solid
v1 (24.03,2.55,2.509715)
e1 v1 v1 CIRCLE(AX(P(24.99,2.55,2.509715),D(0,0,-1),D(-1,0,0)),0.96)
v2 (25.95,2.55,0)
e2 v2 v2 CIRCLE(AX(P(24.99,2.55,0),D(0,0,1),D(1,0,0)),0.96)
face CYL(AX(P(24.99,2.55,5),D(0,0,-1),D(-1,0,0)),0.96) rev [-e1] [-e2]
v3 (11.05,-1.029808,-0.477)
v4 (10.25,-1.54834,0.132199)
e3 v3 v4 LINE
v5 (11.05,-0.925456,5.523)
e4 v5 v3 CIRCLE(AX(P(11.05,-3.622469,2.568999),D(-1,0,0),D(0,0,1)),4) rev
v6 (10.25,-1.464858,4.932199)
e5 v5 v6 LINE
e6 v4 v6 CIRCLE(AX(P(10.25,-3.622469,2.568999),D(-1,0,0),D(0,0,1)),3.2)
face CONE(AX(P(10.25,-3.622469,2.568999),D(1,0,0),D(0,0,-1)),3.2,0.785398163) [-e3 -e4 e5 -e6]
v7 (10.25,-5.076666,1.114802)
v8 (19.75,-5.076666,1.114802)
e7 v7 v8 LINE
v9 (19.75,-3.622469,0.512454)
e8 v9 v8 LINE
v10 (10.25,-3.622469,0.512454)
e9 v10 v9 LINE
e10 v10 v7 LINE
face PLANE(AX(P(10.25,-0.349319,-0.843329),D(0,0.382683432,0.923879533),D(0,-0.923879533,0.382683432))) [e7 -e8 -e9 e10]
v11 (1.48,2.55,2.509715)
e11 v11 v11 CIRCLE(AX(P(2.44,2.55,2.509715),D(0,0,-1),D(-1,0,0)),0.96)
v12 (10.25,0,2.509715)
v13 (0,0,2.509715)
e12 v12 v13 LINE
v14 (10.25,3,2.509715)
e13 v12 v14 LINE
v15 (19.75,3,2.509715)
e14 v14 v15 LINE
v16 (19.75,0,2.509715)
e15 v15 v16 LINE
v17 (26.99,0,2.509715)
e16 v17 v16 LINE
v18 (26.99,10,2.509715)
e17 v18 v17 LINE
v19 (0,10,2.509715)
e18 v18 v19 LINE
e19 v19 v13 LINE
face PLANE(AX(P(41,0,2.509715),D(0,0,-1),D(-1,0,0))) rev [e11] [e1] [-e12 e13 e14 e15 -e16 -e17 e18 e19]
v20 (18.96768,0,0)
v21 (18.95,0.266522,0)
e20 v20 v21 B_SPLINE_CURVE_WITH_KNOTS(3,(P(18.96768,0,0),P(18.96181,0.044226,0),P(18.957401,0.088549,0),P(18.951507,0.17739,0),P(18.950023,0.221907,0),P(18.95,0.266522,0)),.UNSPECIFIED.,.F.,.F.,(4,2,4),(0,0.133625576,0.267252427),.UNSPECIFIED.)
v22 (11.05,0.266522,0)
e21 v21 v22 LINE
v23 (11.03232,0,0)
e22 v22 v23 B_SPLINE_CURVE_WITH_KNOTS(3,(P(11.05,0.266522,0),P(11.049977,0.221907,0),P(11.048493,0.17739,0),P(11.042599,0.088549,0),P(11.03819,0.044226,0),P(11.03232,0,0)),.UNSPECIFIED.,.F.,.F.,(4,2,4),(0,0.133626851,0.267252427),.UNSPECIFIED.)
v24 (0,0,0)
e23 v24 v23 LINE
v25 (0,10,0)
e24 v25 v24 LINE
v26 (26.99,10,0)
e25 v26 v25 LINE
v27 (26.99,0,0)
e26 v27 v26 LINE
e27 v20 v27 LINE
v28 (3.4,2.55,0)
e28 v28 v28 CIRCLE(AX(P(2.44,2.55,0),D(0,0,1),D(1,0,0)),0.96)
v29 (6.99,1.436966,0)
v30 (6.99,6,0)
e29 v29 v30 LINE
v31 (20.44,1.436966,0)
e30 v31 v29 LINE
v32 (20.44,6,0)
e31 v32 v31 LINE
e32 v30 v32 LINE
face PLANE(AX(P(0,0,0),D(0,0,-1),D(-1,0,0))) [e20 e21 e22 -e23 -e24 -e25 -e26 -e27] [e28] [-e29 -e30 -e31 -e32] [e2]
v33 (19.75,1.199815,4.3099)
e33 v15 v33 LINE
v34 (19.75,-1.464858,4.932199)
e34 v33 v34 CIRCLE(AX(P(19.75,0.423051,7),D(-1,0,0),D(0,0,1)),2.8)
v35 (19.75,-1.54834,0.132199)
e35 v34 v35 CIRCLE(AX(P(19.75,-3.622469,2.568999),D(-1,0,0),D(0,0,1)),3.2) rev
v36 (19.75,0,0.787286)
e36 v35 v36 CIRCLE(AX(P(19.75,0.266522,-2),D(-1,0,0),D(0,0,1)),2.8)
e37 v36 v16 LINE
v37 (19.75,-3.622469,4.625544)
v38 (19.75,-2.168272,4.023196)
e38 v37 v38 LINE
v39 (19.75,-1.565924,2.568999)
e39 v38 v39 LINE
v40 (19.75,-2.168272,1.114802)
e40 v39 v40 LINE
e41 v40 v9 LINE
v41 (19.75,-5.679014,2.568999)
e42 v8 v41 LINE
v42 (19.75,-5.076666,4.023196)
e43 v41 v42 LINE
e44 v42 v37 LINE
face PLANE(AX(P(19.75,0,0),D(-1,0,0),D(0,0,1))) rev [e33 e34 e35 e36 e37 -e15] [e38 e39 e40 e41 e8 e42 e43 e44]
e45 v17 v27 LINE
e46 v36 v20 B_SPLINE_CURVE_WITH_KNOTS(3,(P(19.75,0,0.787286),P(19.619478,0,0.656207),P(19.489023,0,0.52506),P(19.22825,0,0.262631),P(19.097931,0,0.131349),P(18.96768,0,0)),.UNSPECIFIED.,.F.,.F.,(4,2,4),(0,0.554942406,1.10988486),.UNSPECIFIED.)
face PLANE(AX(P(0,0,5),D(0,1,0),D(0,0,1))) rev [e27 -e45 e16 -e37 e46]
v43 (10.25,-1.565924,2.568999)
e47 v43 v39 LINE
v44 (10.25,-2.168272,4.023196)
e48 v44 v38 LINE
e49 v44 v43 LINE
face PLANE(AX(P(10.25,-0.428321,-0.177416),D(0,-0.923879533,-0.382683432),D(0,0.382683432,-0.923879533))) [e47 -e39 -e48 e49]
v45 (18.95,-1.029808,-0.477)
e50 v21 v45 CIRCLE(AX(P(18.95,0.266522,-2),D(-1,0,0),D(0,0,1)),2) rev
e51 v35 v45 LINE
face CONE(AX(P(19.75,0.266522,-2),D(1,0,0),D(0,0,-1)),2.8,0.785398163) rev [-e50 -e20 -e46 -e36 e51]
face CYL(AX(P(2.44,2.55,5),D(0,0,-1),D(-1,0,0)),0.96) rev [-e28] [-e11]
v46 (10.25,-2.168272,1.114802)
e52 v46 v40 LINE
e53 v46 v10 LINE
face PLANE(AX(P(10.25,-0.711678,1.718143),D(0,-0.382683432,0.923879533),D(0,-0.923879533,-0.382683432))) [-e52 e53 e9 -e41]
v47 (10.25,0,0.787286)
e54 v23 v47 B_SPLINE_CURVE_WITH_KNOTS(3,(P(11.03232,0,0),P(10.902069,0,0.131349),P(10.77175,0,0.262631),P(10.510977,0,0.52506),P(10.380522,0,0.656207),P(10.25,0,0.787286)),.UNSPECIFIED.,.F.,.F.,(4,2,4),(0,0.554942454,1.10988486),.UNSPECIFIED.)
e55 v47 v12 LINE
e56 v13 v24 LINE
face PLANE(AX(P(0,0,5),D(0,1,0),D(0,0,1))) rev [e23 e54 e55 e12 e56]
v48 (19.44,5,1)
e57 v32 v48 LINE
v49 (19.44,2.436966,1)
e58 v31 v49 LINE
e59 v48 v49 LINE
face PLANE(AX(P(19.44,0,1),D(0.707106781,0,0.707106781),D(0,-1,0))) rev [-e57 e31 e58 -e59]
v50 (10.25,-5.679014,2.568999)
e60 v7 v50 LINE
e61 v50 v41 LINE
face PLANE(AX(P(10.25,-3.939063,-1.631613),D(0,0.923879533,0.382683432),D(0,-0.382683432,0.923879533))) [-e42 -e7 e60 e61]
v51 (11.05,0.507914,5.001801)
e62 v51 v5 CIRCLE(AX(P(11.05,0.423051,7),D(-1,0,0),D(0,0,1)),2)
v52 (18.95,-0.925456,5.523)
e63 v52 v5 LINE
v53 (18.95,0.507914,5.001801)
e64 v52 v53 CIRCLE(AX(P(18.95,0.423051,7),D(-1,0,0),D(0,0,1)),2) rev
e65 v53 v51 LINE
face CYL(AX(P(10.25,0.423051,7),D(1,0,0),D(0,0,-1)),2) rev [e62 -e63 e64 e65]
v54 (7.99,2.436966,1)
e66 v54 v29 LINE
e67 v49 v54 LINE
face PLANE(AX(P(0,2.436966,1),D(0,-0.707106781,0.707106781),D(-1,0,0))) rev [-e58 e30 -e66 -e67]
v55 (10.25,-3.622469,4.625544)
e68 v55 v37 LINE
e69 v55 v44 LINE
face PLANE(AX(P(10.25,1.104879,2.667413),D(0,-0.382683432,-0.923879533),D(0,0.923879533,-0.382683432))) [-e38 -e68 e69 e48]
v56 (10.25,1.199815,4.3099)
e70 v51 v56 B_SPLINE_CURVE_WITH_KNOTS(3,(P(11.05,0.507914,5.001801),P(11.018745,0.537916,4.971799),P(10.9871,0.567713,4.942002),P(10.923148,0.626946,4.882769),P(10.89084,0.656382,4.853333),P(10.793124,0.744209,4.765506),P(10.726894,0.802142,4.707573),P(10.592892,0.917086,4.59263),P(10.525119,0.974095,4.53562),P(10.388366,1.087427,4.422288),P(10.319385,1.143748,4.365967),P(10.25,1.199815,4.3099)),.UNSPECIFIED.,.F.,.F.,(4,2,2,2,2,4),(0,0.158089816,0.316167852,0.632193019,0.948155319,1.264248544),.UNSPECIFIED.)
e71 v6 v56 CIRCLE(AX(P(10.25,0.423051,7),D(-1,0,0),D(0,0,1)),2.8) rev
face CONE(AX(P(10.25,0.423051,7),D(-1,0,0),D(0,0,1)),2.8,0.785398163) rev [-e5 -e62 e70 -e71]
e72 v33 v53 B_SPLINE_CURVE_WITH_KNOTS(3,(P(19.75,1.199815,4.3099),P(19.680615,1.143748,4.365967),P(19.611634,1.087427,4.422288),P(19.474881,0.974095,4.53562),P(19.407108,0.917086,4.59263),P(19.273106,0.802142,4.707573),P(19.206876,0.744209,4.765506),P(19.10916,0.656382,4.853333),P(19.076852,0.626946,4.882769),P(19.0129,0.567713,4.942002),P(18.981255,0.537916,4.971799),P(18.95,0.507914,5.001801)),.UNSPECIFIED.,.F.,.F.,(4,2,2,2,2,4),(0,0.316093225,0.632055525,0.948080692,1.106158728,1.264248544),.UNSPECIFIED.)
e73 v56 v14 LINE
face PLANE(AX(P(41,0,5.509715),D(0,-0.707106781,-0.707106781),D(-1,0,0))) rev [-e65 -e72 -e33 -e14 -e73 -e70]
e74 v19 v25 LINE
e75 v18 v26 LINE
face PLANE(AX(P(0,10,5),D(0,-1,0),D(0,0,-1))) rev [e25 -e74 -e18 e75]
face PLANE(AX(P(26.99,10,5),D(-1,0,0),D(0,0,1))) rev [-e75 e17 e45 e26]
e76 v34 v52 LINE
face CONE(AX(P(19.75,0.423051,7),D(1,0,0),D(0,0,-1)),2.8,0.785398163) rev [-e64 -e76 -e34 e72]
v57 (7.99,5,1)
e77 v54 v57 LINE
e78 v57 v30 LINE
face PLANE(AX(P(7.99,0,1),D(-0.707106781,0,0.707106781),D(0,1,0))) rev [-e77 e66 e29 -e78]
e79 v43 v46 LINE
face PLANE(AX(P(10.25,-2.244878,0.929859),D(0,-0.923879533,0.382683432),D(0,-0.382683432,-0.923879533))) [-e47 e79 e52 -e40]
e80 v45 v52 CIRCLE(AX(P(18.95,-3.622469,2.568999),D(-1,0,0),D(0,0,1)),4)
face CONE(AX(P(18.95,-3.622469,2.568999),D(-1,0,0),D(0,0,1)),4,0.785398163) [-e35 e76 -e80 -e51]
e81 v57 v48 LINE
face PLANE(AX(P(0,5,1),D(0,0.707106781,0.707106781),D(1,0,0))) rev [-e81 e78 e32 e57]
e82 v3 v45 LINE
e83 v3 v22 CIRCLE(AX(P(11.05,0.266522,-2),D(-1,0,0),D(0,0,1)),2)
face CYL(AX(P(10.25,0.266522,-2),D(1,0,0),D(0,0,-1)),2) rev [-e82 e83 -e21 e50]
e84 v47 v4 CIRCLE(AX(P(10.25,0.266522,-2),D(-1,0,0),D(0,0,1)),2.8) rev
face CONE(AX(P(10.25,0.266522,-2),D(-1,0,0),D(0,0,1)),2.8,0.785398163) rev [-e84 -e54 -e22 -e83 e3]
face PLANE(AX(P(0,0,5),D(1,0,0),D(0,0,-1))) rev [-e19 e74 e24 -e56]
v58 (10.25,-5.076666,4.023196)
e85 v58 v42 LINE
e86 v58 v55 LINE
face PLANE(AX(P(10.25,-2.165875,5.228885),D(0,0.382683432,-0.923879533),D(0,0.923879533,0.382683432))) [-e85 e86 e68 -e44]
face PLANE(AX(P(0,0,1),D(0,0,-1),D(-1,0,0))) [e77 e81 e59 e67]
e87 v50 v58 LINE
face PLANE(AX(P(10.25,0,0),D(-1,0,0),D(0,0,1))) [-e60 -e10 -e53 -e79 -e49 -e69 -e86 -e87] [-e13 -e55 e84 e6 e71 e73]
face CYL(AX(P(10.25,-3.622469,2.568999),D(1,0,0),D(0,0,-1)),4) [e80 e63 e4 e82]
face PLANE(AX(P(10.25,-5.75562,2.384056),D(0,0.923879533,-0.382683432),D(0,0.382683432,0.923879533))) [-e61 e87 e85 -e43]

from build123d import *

# Parameters (mm, degrees)
SKETCH1_W           = 26.99
SKETCH1_H           = 10
SKETCH1_R           = 0.96
BOSS_EXTRUDE1_DEPTH = 5
SKETCH3_R           = 4
BOSS_EXTRUDE2_DEPTH = 4.75
FILLET1_R           = 2
FILLET2_R           = 2
CHAMFER1_SIZE       = 0.8
SKETCH6_W           = 3.842122027
SKETCH6_H           = 10
CUT_EXTRUDE1_DEPTH  = 41
CHAMFER3_START      = 10.25
CHAMFER3_DEPTH      = 9.5
SKETCH7_W           = 13.45
SKETCH7_H           = 4.563034457
CUT_EXTRUDE2_DEPTH  = 1
CHAMFER5_SIZE       = 1


with BuildPart() as part:
    # Sketch1 → Boss-Extrude1 (new body)
    with BuildSketch(Plane.XY):
        with Locations((13.495, 5)):
            Rectangle(SKETCH1_W, SKETCH1_H)
        with Locations((2.44, 2.55)):
            Circle(SKETCH1_R, mode=Mode.SUBTRACT)
        with Locations((24.99, 2.55)):
            Circle(SKETCH1_R, mode=Mode.SUBTRACT)
    extrude(amount=BOSS_EXTRUDE1_DEPTH)

    # Sketch3 → Boss-Extrude2 (add, symmetric)
    with BuildSketch(Plane.ZY.offset(-15)):
        with Locations((2.568998912, -3.622468738)):
            Circle(SKETCH3_R)
        Polygon((0.512453731, -3.622468738), (1.114801869, -5.076665781), (2.568998912, -5.679013919), (4.023195955, -5.076665781), (4.625544092, -3.622468738), (4.023195955, -2.168271695), (2.568998912, -1.565923558), (1.114801869, -2.168271695), align=None, mode=Mode.SUBTRACT)
    extrude(amount=BOSS_EXTRUDE2_DEPTH, both=True)

    # Fillet1
    # the kernel refuses this fillet: 2 mm, written as the material it adds along each edge
    with BuildSketch(Plane(origin=(19.75, 0, 0.872614451), x_dir=(0, 0, -1), z_dir=(-1, 0, 0))) as fillet1_piece_1:
        with BuildLine():
            CenterArc((2.851261839, -0.291469576), FILLET1_R, 139.283020083, 32.337148469)
            ThreePointArc((1.335379739, 1.013176529), (0.721358104, 0.435852839), (0, 0))
            Line((0, 0), (0.872614451, 0))
        make_face()
    extrude(amount=9.5)
    with BuildSketch(Plane(origin=(19.75, 0, 4.265383373), x_dir=(0, 0, 1), z_dir=(-1, 0, 0))) as fillet1_piece_2:
        with BuildLine():
            CenterArc((2.674069858, 0.488386288), FILLET1_R, 194.13415607, 29.112659272)
            ThreePointArc((1.217251752, -0.881898721), (0.650423795, -0.383257259), (0, 0))
            Line((0, 0), (0.734616627, 0))
        make_face()
    extrude(amount=9.5)

    # Fillet2
    # the kernel refuses this fillet: 2 mm, written as the material it adds along each edge
    with BuildSketch(Plane(origin=(19.75, 0, 0), x_dir=(0, 1, 0), z_dir=(-1, 0, 0))) as fillet2_piece_1:
        with BuildLine():
            CenterArc((0.266521997, 2), FILLET2_R, 229.596597584, 40.403402416)
            Line((-1.029808248, 0.477000363), (-1.159441272, 0.324700399))
            ThreePointArc((-1.159441272, 0.324700399), (-1.143641139, 0.311177078), (-0.029146958, -0.197864739))
            Line((-0.029146958, -0.197864739), (0, -0.2))
            Line((0, -0.2), (0.266521997, -0.2))
            Line((0.266521997, -0.2), (0.266521997, 0))
        make_face()
    extrude(amount=9.5)
    with BuildSketch(Plane(origin=(19.75, 0, 5), x_dir=(0, -0.870596677984774, 0.491997382393317), z_dir=(-1, 0, 0))) as fillet2_piece_2:
        with BuildLine():
            CenterArc((0.615688034, 1.949333304), FILLET2_R, 240.528051524, 42.396189725)
            Line((-0.368306731, 0.208139948), (-0.466706207, 0.034020613))
            Line((-0.466706207, 0.034020613), (-0.098399476, -0.174119336))
            Line((-0.098399476, -0.174119336), (-0.052901843, -0.192876631))
            ThreePointArc((-0.052901843, -0.192876631), (1.052854803, -0.20795909), (1.10774555, -0.19493333))
            Line((1.10774555, -0.19493333), (1.063013048, 0))
        make_face()
    extrude(amount=9.5)

    # Chamfer1
    # the kernel refuses this chamfer: 0.8 mm, written as the material it takes off along each edge
    with BuildSketch(Plane(origin=(19.75, 0.266521997, -2), x_dir=(0, -0.648165122631187, 0.7614998186503384), z_dir=(0, -0.7614998186503384, -0.648165122631187))) as chamfer1_piece_1_section:
        Polygon((2, CHAMFER1_SIZE), (2 + CHAMFER1_SIZE, 0), (2, 0), align=None)
    chamfer1_piece_1 = revolve(axis=Axis((19.75, 0.266521997, -2), (-1, 0, 0)), revolution_arc=99.346805501, mode=Mode.PRIVATE)
    chamfer1_piece_1 = split(chamfer1_piece_1, bisect_by=Plane(origin=(19.75, 0, -2), z_dir=(0, -1, 0)), keep=Keep.TOP, mode=Mode.PRIVATE)
    add(chamfer1_piece_1, mode=Mode.SUBTRACT)
    with BuildSketch(Plane(origin=(19.75, 0.266521997, -2), x_dir=(0, -0.648165122631187, 0.7614998186503384), z_dir=(0, -0.7614998186503384, -0.648165122631187))) as chamfer1_piece_2_section:
        Polygon((2, CHAMFER1_SIZE), (2 + CHAMFER1_SIZE, 0), (2, 0), align=None)
    chamfer1_piece_2 = revolve(axis=Axis((19.75, 0.266521997, -2), (-1, 0, 0)), revolution_arc=99.346805501, mode=Mode.PRIVATE)
    chamfer1_piece_2 = split(chamfer1_piece_2, bisect_by=Plane(origin=(19.75, 0.266521997, 0), z_dir=(0, 0, -1)), keep=Keep.TOP, mode=Mode.PRIVATE)
    add(chamfer1_piece_2, mode=Mode.SUBTRACT)
    with BuildSketch(Plane(origin=(19.75, 0.423050926, 7), x_dir=(0, 0.8566624684959867, -0.515877325602088), z_dir=(0, 0.515877325602088, 0.8566624684959867))) as chamfer1_piece_3_section:
        Polygon((2, CHAMFER1_SIZE), (2 + CHAMFER1_SIZE, 0), (2, 0), align=None)
    chamfer1_piece_3 = revolve(axis=Axis((19.75, 0.423050926, 7), (-1, 0, 0)), revolution_arc=101.340075028, mode=Mode.PRIVATE)
    chamfer1_piece_3 = split(chamfer1_piece_3, bisect_by=Plane(origin=(19.75, 0, 7), z_dir=(0, -1, 0)), keep=Keep.TOP, mode=Mode.PRIVATE)
    add(chamfer1_piece_3, mode=Mode.SUBTRACT)
    with BuildSketch(Plane(origin=(19.75, 0.423050926, 7), x_dir=(0, 0.8566624684959867, -0.515877325602088), z_dir=(0, 0.515877325602088, 0.8566624684959867))) as chamfer1_piece_4_section:
        Polygon((2, CHAMFER1_SIZE), (2 + CHAMFER1_SIZE, 0), (2, 0), align=None)
    chamfer1_piece_4 = revolve(axis=Axis((19.75, 0.423050926, 7), (-1, 0, 0)), revolution_arc=101.340075028, mode=Mode.PRIVATE)
    chamfer1_piece_4 = split(chamfer1_piece_4, bisect_by=Plane(origin=(19.75, 0.423050926, 5), z_dir=(0, 0, 1)), keep=Keep.TOP, mode=Mode.PRIVATE)
    add(chamfer1_piece_4, mode=Mode.SUBTRACT)
    with BuildSketch(Plane(origin=(19.75, -3.622468738, 2.568998912), x_dir=(0, 0.6742532774459821, 0.7385001813495726), z_dir=(0, 0.7385001813495726, -0.6742532774459821))) as chamfer1_piece_5:
        Polygon((4 - CHAMFER1_SIZE, 0), (4, -CHAMFER1_SIZE), (4, 0), align=None)
    revolve(axis=Axis((19.75, -3.622468738, 2.568998912), (1, 0, 0)), revolution_arc=262.799592141, mode=Mode.SUBTRACT)
    with BuildSketch(Plane(origin=(10.25, 0.266521997, -2), x_dir=(0, -0.648165122631187, 0.7614998186503384), z_dir=(0, -0.7614998186503384, -0.648165122631187))) as chamfer1_piece_6_section:
        Polygon((2 + CHAMFER1_SIZE, 0), (2, -CHAMFER1_SIZE), (2, 0), align=None)
    chamfer1_piece_6 = revolve(axis=Axis((10.25, 0.266521997, -2), (-1, 0, 0)), revolution_arc=99.346805501, mode=Mode.PRIVATE)
    chamfer1_piece_6 = split(chamfer1_piece_6, bisect_by=Plane(origin=(10.25, 0, -2), z_dir=(0, -1, 0)), keep=Keep.TOP, mode=Mode.PRIVATE)
    add(chamfer1_piece_6, mode=Mode.SUBTRACT)
    with BuildSketch(Plane(origin=(10.25, 0.266521997, -2), x_dir=(0, -0.648165122631187, 0.7614998186503384), z_dir=(0, -0.7614998186503384, -0.648165122631187))) as chamfer1_piece_7_section:
        Polygon((2 + CHAMFER1_SIZE, 0), (2, -CHAMFER1_SIZE), (2, 0), align=None)
    chamfer1_piece_7 = revolve(axis=Axis((10.25, 0.266521997, -2), (-1, 0, 0)), revolution_arc=99.346805501, mode=Mode.PRIVATE)
    chamfer1_piece_7 = split(chamfer1_piece_7, bisect_by=Plane(origin=(10.25, 0.266521997, 0), z_dir=(0, 0, -1)), keep=Keep.TOP, mode=Mode.PRIVATE)
    add(chamfer1_piece_7, mode=Mode.SUBTRACT)
    with BuildSketch(Plane(origin=(10.25, 0.423050926, 7), x_dir=(0, 0.8566624684959867, -0.515877325602088), z_dir=(0, 0.515877325602088, 0.8566624684959867))) as chamfer1_piece_8_section:
        Polygon((2, -CHAMFER1_SIZE), (2 + CHAMFER1_SIZE, 0), (2, 0), align=None)
    chamfer1_piece_8 = revolve(axis=Axis((10.25, 0.423050926, 7), (-1, 0, 0)), revolution_arc=101.340075028, mode=Mode.PRIVATE)
    chamfer1_piece_8 = split(chamfer1_piece_8, bisect_by=Plane(origin=(10.25, 0, 7), z_dir=(0, -1, 0)), keep=Keep.TOP, mode=Mode.PRIVATE)
    add(chamfer1_piece_8, mode=Mode.SUBTRACT)
    with BuildSketch(Plane(origin=(10.25, 0.423050926, 7), x_dir=(0, 0.8566624684959867, -0.515877325602088), z_dir=(0, 0.515877325602088, 0.8566624684959867))) as chamfer1_piece_9_section:
        Polygon((2, -CHAMFER1_SIZE), (2 + CHAMFER1_SIZE, 0), (2, 0), align=None)
    chamfer1_piece_9 = revolve(axis=Axis((10.25, 0.423050926, 7), (-1, 0, 0)), revolution_arc=101.340075028, mode=Mode.PRIVATE)
    chamfer1_piece_9 = split(chamfer1_piece_9, bisect_by=Plane(origin=(10.25, 0.423050926, 5), z_dir=(0, 0, 1)), keep=Keep.TOP, mode=Mode.PRIVATE)
    add(chamfer1_piece_9, mode=Mode.SUBTRACT)
    with BuildSketch(Plane(origin=(10.25, -3.622468738, 2.568998912), x_dir=(0, 0.6742532774459821, 0.7385001813495726), z_dir=(0, 0.7385001813495726, -0.6742532774459821))) as chamfer1_piece_10:
        Polygon((4 - CHAMFER1_SIZE, 0), (4, CHAMFER1_SIZE), (4, 0), align=None)
    revolve(axis=Axis((10.25, -3.622468738, 2.568998912), (1, 0, 0)), revolution_arc=262.799592141, mode=Mode.SUBTRACT)

    # Sketch6 → Cut-Extrude1 (cut)
    with BuildSketch(Plane(origin=(0, 0, 0), x_dir=(0, 0, -1), z_dir=(1, 0, 0))):
        with Locations((-4.430776166, 5)):
            Rectangle(SKETCH6_W, SKETCH6_H)
    extrude(amount=CUT_EXTRUDE1_DEPTH, mode=Mode.SUBTRACT)

    # Chamfer3: read off the stored shape, not the designer's step
    # Chamfer3 outline → Chamfer3 (add)
    with BuildSketch(Plane.YZ.offset(CHAMFER3_START)):
        with BuildLine():
            ThreePointArc((0.507913909, 5.001801243), (0.252566824, 5.007279455), (0, 5.045255026))
            Line((0, 5.045255026), (0, 2.509715152))
            Line((0, 2.509715152), (3, 2.509715152))
            Line((3, 2.509715152), (0.507913909, 5.001801243))
        make_face()
    extrude(amount=CHAMFER3_DEPTH)

    # Chamfer3 2 outline → Chamfer3 2 (revolve, cut)
    with BuildSketch(Plane(origin=(0, 0.423050926, 7), x_dir=(0, 1, 0), z_dir=(0, 0, -1))):
        Polygon((2, 19.75), (2, 18.95), (2.8, 19.75), align=None)
        Polygon((2.8, 10.25), (2, 11.05), (2, 10.25), align=None)
    revolve(axis=Axis((0, 0.423050926, 7), (1, 0, 0)), mode=Mode.SUBTRACT)

    # Sketch7 → Cut-Extrude2 (cut)
    with BuildSketch(Plane(origin=(0, 0, 0), x_dir=(-1, 0, 0), z_dir=(0, 0, -1))):
        with Locations((-13.715, 3.718482772)):
            Rectangle(SKETCH7_W, SKETCH7_H)
    extrude(amount=-CUT_EXTRUDE2_DEPTH, mode=Mode.SUBTRACT)

    # Chamfer5
    chamfer5_edges = [part.edges().sort_by_distance(p)[0] for p in [
        (13.715, 6, 1),
        (6.99, 3.718482772, 1),
        (13.715, 1.436965543, 1),
        (20.44, 3.718482772, 1),
    ]]
    chamfer(chamfer5_edges, length=CHAMFER5_SIZE - 0.0001)  # a hair under: the kernel refuses the full size


solid = part.part
